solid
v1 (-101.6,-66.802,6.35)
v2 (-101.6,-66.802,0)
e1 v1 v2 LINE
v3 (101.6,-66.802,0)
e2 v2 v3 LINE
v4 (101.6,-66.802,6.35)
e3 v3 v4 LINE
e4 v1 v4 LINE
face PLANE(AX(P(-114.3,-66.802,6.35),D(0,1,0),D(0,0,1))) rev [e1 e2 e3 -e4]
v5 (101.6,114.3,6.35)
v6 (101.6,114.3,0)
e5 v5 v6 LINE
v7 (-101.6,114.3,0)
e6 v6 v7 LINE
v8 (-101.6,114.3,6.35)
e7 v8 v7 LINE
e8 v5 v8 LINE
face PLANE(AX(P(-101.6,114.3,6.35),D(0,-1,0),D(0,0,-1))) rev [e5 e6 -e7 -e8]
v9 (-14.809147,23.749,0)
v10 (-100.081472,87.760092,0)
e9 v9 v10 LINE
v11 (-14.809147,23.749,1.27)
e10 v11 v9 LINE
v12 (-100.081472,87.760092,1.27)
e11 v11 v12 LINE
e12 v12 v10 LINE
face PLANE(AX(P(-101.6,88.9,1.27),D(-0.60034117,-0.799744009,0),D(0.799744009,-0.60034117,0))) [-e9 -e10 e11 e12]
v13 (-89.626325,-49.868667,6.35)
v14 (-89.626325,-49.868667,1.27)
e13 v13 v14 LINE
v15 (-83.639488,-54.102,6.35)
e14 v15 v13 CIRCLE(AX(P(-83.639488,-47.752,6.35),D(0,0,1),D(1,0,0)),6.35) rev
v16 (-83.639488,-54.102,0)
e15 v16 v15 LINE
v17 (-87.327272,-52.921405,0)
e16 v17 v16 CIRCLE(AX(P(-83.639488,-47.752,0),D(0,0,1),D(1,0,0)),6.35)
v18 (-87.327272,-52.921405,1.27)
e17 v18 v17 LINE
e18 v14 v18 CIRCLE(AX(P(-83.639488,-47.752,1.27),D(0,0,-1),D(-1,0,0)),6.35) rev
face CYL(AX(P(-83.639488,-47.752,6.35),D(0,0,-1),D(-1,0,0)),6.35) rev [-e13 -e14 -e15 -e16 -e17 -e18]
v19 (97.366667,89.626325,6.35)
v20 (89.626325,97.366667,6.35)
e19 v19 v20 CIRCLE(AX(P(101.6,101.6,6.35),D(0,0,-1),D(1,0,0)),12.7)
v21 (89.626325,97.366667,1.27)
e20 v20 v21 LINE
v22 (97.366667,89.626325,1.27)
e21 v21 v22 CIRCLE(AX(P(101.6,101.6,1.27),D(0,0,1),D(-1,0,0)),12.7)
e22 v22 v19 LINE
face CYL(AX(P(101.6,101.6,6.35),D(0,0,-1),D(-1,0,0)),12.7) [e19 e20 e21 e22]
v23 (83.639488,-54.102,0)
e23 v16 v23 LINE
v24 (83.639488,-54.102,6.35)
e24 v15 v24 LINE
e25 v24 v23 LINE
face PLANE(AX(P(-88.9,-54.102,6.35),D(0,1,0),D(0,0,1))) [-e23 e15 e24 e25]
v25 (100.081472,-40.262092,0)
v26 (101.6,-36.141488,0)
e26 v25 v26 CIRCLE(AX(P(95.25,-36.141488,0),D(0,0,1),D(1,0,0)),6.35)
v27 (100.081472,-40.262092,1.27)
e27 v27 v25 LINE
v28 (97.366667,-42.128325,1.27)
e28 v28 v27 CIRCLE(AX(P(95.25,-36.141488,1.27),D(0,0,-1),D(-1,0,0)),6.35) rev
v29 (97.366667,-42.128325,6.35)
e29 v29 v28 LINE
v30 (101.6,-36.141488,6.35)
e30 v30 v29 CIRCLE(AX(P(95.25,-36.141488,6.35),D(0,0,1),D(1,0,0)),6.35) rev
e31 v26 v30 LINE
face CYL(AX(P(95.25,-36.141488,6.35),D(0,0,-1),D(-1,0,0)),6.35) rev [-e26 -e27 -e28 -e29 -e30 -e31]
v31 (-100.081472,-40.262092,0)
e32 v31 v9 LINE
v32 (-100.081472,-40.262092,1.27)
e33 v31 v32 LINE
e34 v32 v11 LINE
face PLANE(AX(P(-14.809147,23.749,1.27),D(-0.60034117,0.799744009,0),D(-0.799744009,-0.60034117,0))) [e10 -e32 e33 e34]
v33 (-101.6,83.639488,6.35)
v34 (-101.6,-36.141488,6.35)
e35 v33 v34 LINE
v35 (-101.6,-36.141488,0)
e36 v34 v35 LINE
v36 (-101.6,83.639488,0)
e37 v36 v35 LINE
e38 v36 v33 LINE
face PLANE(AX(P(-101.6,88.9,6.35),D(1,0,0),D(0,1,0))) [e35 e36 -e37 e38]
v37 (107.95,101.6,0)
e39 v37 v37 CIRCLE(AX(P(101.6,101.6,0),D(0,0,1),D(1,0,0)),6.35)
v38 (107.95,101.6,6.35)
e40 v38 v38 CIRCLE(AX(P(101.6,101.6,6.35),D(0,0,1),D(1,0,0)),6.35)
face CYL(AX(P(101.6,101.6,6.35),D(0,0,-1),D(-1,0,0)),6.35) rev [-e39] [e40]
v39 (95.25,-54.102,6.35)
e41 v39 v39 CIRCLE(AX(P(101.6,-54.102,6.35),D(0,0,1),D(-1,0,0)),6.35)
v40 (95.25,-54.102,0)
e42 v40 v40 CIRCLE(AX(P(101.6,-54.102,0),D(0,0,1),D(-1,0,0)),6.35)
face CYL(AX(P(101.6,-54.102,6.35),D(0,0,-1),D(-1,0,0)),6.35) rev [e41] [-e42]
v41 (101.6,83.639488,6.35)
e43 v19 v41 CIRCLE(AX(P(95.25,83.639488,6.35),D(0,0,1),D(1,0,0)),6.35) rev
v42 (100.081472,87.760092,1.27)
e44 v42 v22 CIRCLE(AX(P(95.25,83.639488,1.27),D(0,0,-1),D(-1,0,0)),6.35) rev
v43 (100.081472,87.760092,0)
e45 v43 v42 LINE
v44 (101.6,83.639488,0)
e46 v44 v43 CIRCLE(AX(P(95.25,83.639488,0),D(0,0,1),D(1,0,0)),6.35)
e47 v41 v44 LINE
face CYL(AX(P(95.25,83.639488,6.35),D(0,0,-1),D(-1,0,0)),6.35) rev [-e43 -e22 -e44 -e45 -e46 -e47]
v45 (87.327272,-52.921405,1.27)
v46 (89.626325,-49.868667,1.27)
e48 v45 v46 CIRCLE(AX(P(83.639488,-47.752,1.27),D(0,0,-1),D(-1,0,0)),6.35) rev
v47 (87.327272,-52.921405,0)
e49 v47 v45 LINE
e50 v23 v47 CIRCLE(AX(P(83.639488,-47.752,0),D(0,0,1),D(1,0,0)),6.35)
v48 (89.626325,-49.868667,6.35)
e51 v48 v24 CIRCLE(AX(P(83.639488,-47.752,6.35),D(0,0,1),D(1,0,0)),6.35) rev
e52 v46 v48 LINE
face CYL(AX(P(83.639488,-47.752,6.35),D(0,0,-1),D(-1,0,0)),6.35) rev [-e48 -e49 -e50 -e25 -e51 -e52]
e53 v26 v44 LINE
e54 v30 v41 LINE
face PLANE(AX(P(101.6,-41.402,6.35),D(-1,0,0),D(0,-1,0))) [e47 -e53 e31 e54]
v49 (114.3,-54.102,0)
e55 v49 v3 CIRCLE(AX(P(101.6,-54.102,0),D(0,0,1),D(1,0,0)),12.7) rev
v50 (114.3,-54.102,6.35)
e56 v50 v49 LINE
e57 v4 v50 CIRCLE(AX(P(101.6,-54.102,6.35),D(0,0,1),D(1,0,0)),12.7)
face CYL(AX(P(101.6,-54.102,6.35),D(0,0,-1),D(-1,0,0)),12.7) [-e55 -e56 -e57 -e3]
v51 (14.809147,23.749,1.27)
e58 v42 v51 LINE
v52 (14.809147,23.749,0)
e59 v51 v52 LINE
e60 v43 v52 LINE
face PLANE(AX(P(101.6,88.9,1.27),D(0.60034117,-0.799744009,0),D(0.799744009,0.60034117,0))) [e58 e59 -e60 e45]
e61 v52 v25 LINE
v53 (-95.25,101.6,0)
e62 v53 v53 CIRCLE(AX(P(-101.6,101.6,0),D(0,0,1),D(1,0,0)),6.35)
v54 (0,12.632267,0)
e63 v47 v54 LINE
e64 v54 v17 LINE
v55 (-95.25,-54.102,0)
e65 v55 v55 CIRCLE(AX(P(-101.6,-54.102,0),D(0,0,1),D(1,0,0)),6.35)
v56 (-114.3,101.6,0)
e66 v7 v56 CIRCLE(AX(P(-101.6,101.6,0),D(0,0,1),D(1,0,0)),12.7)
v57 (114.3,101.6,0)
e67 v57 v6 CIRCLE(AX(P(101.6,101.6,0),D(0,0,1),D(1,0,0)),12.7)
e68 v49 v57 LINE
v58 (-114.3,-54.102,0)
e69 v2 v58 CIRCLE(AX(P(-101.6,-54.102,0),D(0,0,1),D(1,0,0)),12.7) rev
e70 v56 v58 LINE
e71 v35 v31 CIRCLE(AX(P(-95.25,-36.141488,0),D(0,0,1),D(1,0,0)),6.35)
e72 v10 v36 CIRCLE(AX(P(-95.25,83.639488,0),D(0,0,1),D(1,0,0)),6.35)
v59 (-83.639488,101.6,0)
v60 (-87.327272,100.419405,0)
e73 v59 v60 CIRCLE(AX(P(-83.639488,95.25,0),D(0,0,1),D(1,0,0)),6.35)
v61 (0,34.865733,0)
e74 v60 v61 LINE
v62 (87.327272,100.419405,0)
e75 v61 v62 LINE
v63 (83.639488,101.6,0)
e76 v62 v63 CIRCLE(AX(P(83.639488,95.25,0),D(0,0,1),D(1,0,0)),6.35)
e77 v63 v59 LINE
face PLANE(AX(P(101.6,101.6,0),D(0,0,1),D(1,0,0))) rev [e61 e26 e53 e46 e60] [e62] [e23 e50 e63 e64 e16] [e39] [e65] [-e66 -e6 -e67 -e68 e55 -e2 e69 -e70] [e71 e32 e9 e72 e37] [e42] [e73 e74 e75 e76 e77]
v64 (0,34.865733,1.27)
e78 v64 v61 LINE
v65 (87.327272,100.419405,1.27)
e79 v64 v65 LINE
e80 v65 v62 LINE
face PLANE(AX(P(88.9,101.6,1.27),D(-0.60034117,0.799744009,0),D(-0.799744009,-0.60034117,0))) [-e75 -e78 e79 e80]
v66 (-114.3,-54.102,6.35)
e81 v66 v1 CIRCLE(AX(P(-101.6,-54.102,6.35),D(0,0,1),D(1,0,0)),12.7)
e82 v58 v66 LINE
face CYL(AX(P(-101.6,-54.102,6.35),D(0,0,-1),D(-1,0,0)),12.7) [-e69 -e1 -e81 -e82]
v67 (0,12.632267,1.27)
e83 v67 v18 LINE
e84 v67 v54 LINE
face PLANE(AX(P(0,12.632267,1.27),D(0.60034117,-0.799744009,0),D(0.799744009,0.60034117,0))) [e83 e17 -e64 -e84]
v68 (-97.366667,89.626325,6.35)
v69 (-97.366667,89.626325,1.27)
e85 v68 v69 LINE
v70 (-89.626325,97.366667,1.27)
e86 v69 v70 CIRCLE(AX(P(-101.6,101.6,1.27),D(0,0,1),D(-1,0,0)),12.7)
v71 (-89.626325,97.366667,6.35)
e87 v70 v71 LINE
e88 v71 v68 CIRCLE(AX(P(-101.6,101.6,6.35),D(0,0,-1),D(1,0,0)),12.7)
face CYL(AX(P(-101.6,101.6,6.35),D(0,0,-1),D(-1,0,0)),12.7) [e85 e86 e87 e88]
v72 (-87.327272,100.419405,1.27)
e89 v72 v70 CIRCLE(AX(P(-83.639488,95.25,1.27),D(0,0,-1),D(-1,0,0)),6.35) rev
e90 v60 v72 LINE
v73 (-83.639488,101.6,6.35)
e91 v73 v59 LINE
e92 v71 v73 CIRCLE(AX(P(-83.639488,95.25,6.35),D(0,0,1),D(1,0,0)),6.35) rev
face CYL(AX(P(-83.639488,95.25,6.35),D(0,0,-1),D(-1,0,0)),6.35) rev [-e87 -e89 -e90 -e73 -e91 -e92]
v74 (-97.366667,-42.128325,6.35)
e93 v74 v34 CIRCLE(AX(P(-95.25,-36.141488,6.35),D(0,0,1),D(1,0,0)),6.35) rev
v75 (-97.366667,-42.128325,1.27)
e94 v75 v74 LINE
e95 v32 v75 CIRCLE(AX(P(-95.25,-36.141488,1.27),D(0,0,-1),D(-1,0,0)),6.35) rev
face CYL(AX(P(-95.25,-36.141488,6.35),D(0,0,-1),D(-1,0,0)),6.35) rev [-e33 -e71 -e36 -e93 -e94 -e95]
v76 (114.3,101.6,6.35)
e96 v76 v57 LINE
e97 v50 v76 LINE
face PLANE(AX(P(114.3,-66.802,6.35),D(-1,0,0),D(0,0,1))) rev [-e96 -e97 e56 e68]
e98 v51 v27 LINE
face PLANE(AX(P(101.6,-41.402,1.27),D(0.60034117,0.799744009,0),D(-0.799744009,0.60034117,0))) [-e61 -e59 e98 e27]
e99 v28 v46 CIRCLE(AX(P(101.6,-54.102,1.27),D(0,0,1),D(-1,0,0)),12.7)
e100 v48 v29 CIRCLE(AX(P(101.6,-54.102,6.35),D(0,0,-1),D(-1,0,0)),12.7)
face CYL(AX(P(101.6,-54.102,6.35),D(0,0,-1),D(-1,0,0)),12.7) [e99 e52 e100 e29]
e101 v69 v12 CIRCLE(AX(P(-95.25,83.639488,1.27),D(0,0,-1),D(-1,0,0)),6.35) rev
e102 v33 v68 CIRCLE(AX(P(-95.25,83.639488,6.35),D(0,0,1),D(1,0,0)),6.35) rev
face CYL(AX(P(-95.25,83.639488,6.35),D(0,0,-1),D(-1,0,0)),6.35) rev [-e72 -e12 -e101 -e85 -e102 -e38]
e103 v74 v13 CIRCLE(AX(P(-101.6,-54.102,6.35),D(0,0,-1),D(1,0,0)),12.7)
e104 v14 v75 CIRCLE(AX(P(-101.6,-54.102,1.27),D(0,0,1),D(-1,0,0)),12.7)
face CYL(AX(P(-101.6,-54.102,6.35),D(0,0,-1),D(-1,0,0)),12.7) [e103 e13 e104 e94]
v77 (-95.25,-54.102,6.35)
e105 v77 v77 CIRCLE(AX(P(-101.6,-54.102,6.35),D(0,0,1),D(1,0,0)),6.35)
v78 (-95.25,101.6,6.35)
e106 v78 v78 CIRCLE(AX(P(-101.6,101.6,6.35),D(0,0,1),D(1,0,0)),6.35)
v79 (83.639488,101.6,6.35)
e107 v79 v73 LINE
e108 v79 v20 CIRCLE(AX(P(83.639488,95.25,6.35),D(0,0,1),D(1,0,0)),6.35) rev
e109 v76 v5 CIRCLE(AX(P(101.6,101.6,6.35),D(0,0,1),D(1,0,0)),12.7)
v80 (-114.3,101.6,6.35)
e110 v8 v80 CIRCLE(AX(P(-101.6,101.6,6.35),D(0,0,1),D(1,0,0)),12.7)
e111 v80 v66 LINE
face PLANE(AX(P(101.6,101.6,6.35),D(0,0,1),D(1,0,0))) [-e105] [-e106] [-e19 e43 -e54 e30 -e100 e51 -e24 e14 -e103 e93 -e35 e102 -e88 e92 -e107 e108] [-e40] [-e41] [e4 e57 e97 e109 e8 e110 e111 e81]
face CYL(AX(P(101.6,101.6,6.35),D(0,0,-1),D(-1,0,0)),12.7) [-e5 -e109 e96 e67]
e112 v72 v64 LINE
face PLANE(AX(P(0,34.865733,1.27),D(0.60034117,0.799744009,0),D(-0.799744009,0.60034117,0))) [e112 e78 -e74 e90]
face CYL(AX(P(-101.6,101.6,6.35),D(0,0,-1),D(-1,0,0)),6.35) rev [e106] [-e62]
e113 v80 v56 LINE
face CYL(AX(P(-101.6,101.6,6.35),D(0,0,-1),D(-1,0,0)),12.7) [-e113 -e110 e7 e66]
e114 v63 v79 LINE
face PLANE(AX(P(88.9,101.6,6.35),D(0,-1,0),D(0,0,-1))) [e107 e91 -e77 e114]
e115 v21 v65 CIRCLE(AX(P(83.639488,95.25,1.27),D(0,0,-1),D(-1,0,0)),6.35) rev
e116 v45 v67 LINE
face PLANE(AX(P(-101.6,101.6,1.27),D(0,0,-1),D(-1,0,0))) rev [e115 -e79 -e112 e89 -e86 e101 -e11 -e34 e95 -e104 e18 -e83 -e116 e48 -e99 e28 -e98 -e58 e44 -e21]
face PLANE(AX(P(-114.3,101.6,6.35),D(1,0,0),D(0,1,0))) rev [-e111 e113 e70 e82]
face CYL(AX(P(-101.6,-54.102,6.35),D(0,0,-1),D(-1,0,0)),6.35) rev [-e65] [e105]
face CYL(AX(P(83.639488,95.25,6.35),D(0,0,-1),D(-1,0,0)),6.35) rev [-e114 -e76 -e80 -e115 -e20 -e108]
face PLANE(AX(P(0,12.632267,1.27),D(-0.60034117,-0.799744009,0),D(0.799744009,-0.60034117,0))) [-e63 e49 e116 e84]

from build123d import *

# Parameters (mm, degrees)
SKETCH1_R           = 6.35
OUTLINE_DEPTH       = 6.35
FILLET2_R           = 12.7
BOSS_EXTRUDE1_DEPTH = 1.27
FILLET1_R           = 6.35


with BuildPart() as part:
    # Sketch1 → Outline (new body)
    with BuildSketch(Plane.XY):
        with BuildLine():
            Line((-101.6, 114.3), (101.6, 114.3))
            ThreePointArc((101.6, 114.3), (110.580256121, 110.580256121), (114.3, 101.6))
            Line((114.3, 101.6), (114.3, -66.802))
            Line((114.3, -66.802), (-114.3, -66.802))
            Line((-114.3, -66.802), (-114.3, 101.6))
            ThreePointArc((-114.3, 101.6), (-110.580256121, 110.580256121), (-101.6, 114.3))
        make_face()
        with Locations((-101.6, 101.6)):
            Circle(SKETCH1_R, mode=Mode.SUBTRACT)
        with Locations((101.6, 101.6)):
            Circle(SKETCH1_R, mode=Mode.SUBTRACT)
        with Locations((-101.6, -54.102)):
            Circle(SKETCH1_R, mode=Mode.SUBTRACT)
        with Locations(Location((101.6, -54.102, 0), (0, 0, 180))):
            Circle(SKETCH1_R, mode=Mode.SUBTRACT)
        with BuildLine():
            Line((-101.6, 88.9), (-101.6, -41.402))
            ThreePointArc((-101.6, -41.402), (-92.619743879, -45.121743879), (-88.9, -54.102))
            Line((-88.9, -54.102), (88.9, -54.102))
            ThreePointArc((88.9, -54.102), (92.619743879, -45.121743879), (101.6, -41.402))
            Line((101.6, -41.402), (101.6, 88.9))
            ThreePointArc((101.6, 88.9), (92.619743879, 92.619743879), (88.9, 101.6))
            Line((88.9, 101.6), (-88.9, 101.6))
            ThreePointArc((-88.9, 101.6), (-92.619743879, 92.619743879), (-101.6, 88.9))
        make_face(mode=Mode.SUBTRACT)
    extrude(amount=OUTLINE_DEPTH)

    # Fillet2
    fillet2_edges = [part.edges().sort_by_distance(p)[0] for p in [
        (114.3, -66.802, 3.175),
        (-114.3, -66.802, 3.175),
    ]]
    fillet(fillet2_edges, radius=FILLET2_R)

    # Sketch2 → Boss-Extrude1 (add)
    with BuildSketch(Plane(origin=(0, 0, 0), x_dir=(-1, 0, 0), z_dir=(0, 0, -1))):
        with BuildLine():
            Line((-101.6, 88.9), (-14.809147425, 23.749))
            Line((-14.809147425, 23.749), (-101.6, -41.402))
            ThreePointArc((-101.6, -41.402), (-92.619743879, -45.121743879), (-88.9, -54.102))
            Line((-88.9, -54.102), (0, 12.632266667))
            Line((0, 12.632266667), (88.9, -54.102))
            ThreePointArc((88.9, -54.102), (92.619743879, -45.121743879), (101.6, -41.402))
            Line((101.6, -41.402), (14.809147425, 23.749))
            Line((14.809147425, 23.749), (101.6, 88.9))
            ThreePointArc((101.6, 88.9), (92.619743879, 92.619743879), (88.9, 101.6))
            Line((88.9, 101.6), (0, 34.865733333))
            Line((0, 34.865733333), (-88.9, 101.6))
            ThreePointArc((-88.9, 101.6), (-92.619743879, 92.619743879), (-101.6, 88.9))
        make_face()
    extrude(amount=-BOSS_EXTRUDE1_DEPTH)

    # Fillet1
    # the kernel refuses this fillet: 6.35 mm, written as the material it adds along each edge
    with BuildSketch(Plane(origin=(101.6, 88.9, -11.881280605), x_dir=(0, -1, 0), z_dir=(0, 0, 1))) as fillet1_piece_1_section:
        with BuildLine():
            CenterArc((5.260512242, -6.35), FILLET1_R, 90, 70.528779366)
            ThreePointArc((-0.726325172, -4.233333333), (-0.182898292, -2.14759513), (0, 0))
            Line((0, 0), (5.260512242, 0))
        make_face()
    fillet1_piece_1 = extrude(amount=18.231280605, mode=Mode.PRIVATE)
    fillet1_piece_1 = split(fillet1_piece_1, bisect_by=Plane(origin=(101.237498755, 87.006858293, 0), z_dir=(0, 0, 1)), keep=Keep.TOP, mode=Mode.PRIVATE)
    add(fillet1_piece_1)
    with BuildSketch(Plane(origin=(88.9, 101.6, -11.881280605), x_dir=(-1, 0, 0), z_dir=(0, 0, 1))) as fillet1_piece_2_section:
        with BuildLine():
            CenterArc((5.260512242, 6.35), FILLET1_R, 199.471220634, 70.528779366)
            ThreePointArc((-0.726325172, 4.233333333), (-0.182898292, 2.14759513), (0, 0))
            Line((0, 0), (5.260512242, 0))
        make_face()
    fillet1_piece_2 = extrude(amount=18.231280605, mode=Mode.PRIVATE)
    fillet1_piece_2 = split(fillet1_piece_2, bisect_by=Plane(origin=(86.835808608, 101.33047194, 0), z_dir=(0, 0, 1)), keep=Keep.TOP, mode=Mode.PRIVATE)
    add(fillet1_piece_2)
    with BuildSketch(Plane(origin=(-101.6, 88.9, -11.881280605), x_dir=(0, -1, 0), z_dir=(0, 0, 1))) as fillet1_piece_3_section:
        with BuildLine():
            CenterArc((5.260512242, 6.35), FILLET1_R, 199.471220634, 70.528779366)
            ThreePointArc((-0.726325172, 4.233333333), (-0.182898292, 2.14759513), (0, 0))
            Line((0, 0), (5.260512242, 0))
        make_face()
    fillet1_piece_3 = extrude(amount=18.231280605, mode=Mode.PRIVATE)
    fillet1_piece_3 = split(fillet1_piece_3, bisect_by=Plane(origin=(-101.237498755, 87.006858293, 0), z_dir=(0, 0, 1)), keep=Keep.TOP, mode=Mode.PRIVATE)
    add(fillet1_piece_3)
    with BuildSketch(Plane(origin=(-88.9, 101.6, -11.881280605), x_dir=(1, 0, 0), z_dir=(0, 0, 1))) as fillet1_piece_4_section:
        with BuildLine():
            CenterArc((5.260512242, -6.35), FILLET1_R, 90, 70.528779366)
            ThreePointArc((-0.726325172, -4.233333333), (-0.182898292, -2.14759513), (0, 0))
            Line((0, 0), (5.260512242, 0))
        make_face()
    fillet1_piece_4 = extrude(amount=18.231280605, mode=Mode.PRIVATE)
    fillet1_piece_4 = split(fillet1_piece_4, bisect_by=Plane(origin=(-86.835808608, 101.33047194, 0), z_dir=(0, 0, 1)), keep=Keep.TOP, mode=Mode.PRIVATE)
    add(fillet1_piece_4)
    with BuildSketch(Plane(origin=(-101.6, -41.402, -11.881280605), x_dir=(0, 1, 0), z_dir=(0, 0, 1))) as fillet1_piece_5_section:
        with BuildLine():
            CenterArc((5.260512242, -6.35), FILLET1_R, 90, 70.528779366)
            ThreePointArc((-0.726325172, -4.233333333), (-0.182898292, -2.14759513), (0, 0))
            Line((0, 0), (5.260512242, 0))
        make_face()
    fillet1_piece_5 = extrude(amount=18.231280605, mode=Mode.PRIVATE)
    fillet1_piece_5 = split(fillet1_piece_5, bisect_by=Plane(origin=(-101.237498755, -39.508858293, 0), z_dir=(0, 0, 1)), keep=Keep.TOP, mode=Mode.PRIVATE)
    add(fillet1_piece_5)
    with BuildSketch(Plane(origin=(101.6, -41.402, -11.881280605), x_dir=(0, 1, 0), z_dir=(0, 0, 1))) as fillet1_piece_6_section:
        with BuildLine():
            CenterArc((5.260512242, 6.35), FILLET1_R, 199.471220634, 70.528779366)
            ThreePointArc((-0.726325172, 4.233333333), (-0.182898292, 2.14759513), (0, 0))
            Line((0, 0), (5.260512242, 0))
        make_face()
    fillet1_piece_6 = extrude(amount=18.231280605, mode=Mode.PRIVATE)
    fillet1_piece_6 = split(fillet1_piece_6, bisect_by=Plane(origin=(101.237498755, -39.508858293, 0), z_dir=(0, 0, 1)), keep=Keep.TOP, mode=Mode.PRIVATE)
    add(fillet1_piece_6)
    with BuildSketch(Plane(origin=(-88.9, -54.102, -11.881280605), x_dir=(1, 0, 0), z_dir=(0, 0, 1))) as fillet1_piece_7_section:
        with BuildLine():
            CenterArc((5.260512242, 6.35), FILLET1_R, 199.471220634, 70.528779366)
            ThreePointArc((-0.726325172, 4.233333333), (-0.182898292, 2.14759513), (0, 0))
            Line((0, 0), (5.260512242, 0))
        make_face()
    fillet1_piece_7 = extrude(amount=18.231280605, mode=Mode.PRIVATE)
    fillet1_piece_7 = split(fillet1_piece_7, bisect_by=Plane(origin=(-86.835808608, -53.83247194, 0), z_dir=(0, 0, 1)), keep=Keep.TOP, mode=Mode.PRIVATE)
    add(fillet1_piece_7)
    with BuildSketch(Plane(origin=(88.9, -54.102, -11.881280605), x_dir=(-1, 0, 0), z_dir=(0, 0, 1))) as fillet1_piece_8_section:
        with BuildLine():
            CenterArc((5.260512242, -6.35), FILLET1_R, 90, 70.528779366)
            ThreePointArc((-0.726325172, -4.233333333), (-0.182898292, -2.14759513), (0, 0))
            Line((0, 0), (5.260512242, 0))
        make_face()
    fillet1_piece_8 = extrude(amount=18.231280605, mode=Mode.PRIVATE)
    fillet1_piece_8 = split(fillet1_piece_8, bisect_by=Plane(origin=(86.835808608, -53.83247194, 0), z_dir=(0, 0, 1)), keep=Keep.TOP, mode=Mode.PRIVATE)
    add(fillet1_piece_8)


solid = part.part
